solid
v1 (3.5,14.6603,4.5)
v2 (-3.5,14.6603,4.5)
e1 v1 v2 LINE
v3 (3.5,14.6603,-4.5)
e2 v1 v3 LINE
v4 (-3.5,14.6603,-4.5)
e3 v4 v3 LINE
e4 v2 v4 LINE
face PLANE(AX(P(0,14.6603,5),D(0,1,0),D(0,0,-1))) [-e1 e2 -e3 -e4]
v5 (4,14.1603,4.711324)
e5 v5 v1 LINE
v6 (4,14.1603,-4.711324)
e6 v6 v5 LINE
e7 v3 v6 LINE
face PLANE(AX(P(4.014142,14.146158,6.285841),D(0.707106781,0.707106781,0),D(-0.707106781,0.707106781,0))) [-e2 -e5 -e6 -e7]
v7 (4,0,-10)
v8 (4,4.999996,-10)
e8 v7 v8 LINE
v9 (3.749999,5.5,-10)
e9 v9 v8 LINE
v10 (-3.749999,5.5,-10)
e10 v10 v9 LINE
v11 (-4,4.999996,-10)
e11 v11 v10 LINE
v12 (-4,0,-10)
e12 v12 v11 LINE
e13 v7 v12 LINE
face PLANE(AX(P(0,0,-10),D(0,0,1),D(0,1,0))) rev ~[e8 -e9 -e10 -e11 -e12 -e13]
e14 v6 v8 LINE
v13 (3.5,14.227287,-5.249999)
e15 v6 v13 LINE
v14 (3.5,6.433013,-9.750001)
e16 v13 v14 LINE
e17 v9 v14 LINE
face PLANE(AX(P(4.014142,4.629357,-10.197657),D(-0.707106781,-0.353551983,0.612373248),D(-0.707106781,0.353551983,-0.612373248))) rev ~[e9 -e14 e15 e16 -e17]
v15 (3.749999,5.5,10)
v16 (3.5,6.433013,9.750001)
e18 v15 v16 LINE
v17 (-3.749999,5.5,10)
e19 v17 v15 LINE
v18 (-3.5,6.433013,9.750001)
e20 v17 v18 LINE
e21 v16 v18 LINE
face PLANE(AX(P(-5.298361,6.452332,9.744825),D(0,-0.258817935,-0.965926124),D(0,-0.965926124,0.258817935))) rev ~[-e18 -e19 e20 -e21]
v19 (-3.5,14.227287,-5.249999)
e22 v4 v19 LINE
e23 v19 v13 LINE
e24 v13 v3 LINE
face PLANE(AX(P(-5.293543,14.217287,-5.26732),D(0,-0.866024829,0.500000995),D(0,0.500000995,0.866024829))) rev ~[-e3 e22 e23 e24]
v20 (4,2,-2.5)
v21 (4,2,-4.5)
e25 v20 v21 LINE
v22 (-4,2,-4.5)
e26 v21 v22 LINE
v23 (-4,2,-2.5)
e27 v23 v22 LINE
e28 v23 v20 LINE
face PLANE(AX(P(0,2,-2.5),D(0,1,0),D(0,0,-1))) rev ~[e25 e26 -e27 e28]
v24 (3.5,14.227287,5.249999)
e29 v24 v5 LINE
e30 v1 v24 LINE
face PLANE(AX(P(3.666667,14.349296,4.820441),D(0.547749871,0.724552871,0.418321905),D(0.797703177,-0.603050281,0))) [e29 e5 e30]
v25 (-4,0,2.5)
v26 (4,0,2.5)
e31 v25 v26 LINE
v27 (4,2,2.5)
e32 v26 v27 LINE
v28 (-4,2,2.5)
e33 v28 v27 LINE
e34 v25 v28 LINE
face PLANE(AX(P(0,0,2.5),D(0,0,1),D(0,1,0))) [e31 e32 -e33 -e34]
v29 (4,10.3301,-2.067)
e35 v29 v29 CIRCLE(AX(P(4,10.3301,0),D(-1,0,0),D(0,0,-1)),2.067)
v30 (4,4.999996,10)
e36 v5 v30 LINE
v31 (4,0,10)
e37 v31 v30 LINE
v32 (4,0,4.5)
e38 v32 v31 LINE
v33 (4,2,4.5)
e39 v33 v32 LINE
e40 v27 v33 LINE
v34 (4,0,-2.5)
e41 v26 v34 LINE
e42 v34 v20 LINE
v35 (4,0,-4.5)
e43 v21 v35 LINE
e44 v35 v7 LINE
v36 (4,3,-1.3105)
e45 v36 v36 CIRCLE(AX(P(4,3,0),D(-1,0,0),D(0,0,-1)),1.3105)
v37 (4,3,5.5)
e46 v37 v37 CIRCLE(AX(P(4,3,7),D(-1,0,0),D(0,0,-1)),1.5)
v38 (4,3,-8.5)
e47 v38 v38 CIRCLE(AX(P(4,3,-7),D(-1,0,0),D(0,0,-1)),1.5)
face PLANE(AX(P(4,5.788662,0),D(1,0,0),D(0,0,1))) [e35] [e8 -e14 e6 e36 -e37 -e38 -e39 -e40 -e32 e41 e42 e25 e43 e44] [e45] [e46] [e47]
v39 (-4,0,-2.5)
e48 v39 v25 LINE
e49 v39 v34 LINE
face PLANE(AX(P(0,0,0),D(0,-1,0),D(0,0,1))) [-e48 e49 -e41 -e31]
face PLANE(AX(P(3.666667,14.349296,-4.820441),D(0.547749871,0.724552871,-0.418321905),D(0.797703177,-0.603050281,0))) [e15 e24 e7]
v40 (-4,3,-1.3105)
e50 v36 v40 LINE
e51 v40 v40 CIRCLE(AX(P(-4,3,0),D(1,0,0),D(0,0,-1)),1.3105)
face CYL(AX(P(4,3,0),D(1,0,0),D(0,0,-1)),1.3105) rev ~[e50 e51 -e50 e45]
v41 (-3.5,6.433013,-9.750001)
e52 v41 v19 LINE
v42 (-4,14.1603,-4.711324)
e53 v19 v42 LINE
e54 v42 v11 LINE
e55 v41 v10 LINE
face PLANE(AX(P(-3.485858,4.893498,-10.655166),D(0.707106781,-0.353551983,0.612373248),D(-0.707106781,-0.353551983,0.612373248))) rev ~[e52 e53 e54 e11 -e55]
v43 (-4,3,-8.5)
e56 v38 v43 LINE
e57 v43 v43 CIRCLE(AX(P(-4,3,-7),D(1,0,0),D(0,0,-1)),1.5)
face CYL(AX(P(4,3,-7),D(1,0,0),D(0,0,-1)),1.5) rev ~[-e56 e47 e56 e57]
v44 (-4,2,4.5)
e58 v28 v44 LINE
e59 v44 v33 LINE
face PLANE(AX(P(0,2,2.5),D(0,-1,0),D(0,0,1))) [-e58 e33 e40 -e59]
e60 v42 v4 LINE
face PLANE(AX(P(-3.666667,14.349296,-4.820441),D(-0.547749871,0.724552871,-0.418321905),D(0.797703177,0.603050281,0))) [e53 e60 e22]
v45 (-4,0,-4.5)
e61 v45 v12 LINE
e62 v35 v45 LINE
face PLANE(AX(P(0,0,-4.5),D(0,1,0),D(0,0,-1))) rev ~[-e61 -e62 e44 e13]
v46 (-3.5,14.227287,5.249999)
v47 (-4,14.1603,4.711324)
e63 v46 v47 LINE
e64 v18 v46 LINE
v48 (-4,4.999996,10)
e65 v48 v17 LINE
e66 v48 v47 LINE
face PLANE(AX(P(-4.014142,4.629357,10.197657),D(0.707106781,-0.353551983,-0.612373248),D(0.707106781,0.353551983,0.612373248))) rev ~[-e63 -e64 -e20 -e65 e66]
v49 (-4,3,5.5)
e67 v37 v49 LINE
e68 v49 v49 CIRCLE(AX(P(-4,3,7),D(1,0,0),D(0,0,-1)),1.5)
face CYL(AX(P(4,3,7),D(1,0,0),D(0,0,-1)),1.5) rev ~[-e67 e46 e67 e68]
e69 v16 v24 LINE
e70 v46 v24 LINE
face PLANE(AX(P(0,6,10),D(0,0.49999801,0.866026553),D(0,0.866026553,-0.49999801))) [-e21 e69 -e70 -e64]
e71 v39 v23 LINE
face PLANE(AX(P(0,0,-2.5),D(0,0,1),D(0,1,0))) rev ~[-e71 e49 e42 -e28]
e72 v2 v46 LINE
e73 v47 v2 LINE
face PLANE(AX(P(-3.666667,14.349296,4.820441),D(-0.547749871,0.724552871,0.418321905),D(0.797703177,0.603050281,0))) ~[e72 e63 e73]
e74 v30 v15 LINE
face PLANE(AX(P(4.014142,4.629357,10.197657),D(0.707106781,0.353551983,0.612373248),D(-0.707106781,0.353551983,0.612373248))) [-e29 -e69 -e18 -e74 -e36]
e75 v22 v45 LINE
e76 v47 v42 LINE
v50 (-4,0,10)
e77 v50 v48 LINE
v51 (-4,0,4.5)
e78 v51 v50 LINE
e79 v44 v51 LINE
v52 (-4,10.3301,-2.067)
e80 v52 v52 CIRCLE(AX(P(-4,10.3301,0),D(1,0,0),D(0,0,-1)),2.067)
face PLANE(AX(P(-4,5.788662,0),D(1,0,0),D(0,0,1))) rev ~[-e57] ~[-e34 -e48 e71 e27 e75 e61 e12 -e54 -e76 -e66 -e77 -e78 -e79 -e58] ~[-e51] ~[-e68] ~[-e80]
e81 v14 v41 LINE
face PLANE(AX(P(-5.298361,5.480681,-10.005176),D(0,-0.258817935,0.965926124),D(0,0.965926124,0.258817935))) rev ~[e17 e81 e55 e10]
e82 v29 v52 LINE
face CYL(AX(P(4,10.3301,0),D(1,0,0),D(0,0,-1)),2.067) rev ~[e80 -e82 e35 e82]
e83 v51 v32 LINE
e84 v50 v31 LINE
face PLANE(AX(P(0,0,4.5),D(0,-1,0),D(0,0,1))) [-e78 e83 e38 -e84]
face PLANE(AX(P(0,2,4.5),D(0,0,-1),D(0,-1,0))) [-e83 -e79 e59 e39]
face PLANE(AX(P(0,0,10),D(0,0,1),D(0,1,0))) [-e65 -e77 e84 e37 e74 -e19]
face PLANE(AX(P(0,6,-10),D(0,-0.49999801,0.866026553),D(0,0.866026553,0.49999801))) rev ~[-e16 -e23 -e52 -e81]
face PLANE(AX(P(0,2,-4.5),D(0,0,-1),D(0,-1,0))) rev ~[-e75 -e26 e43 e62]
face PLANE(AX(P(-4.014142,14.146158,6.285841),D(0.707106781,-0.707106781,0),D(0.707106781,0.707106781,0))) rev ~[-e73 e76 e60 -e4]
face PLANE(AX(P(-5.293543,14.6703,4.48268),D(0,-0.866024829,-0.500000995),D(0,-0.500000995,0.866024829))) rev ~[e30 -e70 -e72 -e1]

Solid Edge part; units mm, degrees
sketch "Sketch1" plane through (0, 0, 0) normal (1, 0, 0) x (0, 1, 0)
  line L0 (0, -10) -> (6, -10)
  line L1 (6, -10) -> (14.6603, -5)
  line L2 (14.6603, 5) -> (14.6603, -5)
  line L3 (6, 10) -> (14.6603, 5)
  line L4 (0, 10) -> (6, 10)
  line L5 (0, 4.5) -> (0, 10)
  line L6 (2, 4.5) -> (0, 4.5)
  line L7 (2, 2.5) -> (2, 4.5)
  line L8 (0, 2.5) -> (2, 2.5)
  line L9 (0, 0) -> (0, 2.5)
  line L10 (0, 0) -> (0, -2.5)
  line L11 (0, -2.5) -> (2, -2.5)
  line L12 (2, -2.5) -> (2, -4.5)
  line L13 (2, -4.5) -> (0, -4.5)
  line L14 (0, -4.5) -> (0, -10)
  dimension "D1" = 6
  dimension "D2" = 10
  dimension "D3" = 2.5
  dimension "D4" = 2
  dimension "D5" = 2
  dimension "D6" = 2.5
  dimension "D7" = 2
  dimension "D8" = 2
  dimension "D9" = 5.5
  dimension "D10" = 5.5
extrude "Ajout_matière_1" add sketch "Sketch1" along normal mid plane 8
hole "Perçage_1" at (4, 3, 7) direction (-1, 0, 0) diameter 3 end up to next
hole "Hole1" at (4, 3, -7) direction (-1, 0, 0) diameter 3 end up to next
hole "Perçage_3" at (4, 3, 0) direction (-1, 0, 0) diameter 2.621 end up to next
hole "Perçage_4" at (4, 10.3301, 0) direction (-1, 0, 0) diameter 4.134 end up to next
chamfer "Chanfrein_1" distance 0.5 angle 45 10 edges at (-4, 14.6603, 0) (4, 14.6603, 0) (0, 14.6603, 5) (0, 14.6603, -5) (-4, 10.3301, 7.5) (4, 10.3301, 7.5) (-4, 10.3301, -7.5) (4, 10.3301, -7.5) (0, 6, 10) (0, 6, -10)
properties material "Aluminium AU4G, 2024_T4"
